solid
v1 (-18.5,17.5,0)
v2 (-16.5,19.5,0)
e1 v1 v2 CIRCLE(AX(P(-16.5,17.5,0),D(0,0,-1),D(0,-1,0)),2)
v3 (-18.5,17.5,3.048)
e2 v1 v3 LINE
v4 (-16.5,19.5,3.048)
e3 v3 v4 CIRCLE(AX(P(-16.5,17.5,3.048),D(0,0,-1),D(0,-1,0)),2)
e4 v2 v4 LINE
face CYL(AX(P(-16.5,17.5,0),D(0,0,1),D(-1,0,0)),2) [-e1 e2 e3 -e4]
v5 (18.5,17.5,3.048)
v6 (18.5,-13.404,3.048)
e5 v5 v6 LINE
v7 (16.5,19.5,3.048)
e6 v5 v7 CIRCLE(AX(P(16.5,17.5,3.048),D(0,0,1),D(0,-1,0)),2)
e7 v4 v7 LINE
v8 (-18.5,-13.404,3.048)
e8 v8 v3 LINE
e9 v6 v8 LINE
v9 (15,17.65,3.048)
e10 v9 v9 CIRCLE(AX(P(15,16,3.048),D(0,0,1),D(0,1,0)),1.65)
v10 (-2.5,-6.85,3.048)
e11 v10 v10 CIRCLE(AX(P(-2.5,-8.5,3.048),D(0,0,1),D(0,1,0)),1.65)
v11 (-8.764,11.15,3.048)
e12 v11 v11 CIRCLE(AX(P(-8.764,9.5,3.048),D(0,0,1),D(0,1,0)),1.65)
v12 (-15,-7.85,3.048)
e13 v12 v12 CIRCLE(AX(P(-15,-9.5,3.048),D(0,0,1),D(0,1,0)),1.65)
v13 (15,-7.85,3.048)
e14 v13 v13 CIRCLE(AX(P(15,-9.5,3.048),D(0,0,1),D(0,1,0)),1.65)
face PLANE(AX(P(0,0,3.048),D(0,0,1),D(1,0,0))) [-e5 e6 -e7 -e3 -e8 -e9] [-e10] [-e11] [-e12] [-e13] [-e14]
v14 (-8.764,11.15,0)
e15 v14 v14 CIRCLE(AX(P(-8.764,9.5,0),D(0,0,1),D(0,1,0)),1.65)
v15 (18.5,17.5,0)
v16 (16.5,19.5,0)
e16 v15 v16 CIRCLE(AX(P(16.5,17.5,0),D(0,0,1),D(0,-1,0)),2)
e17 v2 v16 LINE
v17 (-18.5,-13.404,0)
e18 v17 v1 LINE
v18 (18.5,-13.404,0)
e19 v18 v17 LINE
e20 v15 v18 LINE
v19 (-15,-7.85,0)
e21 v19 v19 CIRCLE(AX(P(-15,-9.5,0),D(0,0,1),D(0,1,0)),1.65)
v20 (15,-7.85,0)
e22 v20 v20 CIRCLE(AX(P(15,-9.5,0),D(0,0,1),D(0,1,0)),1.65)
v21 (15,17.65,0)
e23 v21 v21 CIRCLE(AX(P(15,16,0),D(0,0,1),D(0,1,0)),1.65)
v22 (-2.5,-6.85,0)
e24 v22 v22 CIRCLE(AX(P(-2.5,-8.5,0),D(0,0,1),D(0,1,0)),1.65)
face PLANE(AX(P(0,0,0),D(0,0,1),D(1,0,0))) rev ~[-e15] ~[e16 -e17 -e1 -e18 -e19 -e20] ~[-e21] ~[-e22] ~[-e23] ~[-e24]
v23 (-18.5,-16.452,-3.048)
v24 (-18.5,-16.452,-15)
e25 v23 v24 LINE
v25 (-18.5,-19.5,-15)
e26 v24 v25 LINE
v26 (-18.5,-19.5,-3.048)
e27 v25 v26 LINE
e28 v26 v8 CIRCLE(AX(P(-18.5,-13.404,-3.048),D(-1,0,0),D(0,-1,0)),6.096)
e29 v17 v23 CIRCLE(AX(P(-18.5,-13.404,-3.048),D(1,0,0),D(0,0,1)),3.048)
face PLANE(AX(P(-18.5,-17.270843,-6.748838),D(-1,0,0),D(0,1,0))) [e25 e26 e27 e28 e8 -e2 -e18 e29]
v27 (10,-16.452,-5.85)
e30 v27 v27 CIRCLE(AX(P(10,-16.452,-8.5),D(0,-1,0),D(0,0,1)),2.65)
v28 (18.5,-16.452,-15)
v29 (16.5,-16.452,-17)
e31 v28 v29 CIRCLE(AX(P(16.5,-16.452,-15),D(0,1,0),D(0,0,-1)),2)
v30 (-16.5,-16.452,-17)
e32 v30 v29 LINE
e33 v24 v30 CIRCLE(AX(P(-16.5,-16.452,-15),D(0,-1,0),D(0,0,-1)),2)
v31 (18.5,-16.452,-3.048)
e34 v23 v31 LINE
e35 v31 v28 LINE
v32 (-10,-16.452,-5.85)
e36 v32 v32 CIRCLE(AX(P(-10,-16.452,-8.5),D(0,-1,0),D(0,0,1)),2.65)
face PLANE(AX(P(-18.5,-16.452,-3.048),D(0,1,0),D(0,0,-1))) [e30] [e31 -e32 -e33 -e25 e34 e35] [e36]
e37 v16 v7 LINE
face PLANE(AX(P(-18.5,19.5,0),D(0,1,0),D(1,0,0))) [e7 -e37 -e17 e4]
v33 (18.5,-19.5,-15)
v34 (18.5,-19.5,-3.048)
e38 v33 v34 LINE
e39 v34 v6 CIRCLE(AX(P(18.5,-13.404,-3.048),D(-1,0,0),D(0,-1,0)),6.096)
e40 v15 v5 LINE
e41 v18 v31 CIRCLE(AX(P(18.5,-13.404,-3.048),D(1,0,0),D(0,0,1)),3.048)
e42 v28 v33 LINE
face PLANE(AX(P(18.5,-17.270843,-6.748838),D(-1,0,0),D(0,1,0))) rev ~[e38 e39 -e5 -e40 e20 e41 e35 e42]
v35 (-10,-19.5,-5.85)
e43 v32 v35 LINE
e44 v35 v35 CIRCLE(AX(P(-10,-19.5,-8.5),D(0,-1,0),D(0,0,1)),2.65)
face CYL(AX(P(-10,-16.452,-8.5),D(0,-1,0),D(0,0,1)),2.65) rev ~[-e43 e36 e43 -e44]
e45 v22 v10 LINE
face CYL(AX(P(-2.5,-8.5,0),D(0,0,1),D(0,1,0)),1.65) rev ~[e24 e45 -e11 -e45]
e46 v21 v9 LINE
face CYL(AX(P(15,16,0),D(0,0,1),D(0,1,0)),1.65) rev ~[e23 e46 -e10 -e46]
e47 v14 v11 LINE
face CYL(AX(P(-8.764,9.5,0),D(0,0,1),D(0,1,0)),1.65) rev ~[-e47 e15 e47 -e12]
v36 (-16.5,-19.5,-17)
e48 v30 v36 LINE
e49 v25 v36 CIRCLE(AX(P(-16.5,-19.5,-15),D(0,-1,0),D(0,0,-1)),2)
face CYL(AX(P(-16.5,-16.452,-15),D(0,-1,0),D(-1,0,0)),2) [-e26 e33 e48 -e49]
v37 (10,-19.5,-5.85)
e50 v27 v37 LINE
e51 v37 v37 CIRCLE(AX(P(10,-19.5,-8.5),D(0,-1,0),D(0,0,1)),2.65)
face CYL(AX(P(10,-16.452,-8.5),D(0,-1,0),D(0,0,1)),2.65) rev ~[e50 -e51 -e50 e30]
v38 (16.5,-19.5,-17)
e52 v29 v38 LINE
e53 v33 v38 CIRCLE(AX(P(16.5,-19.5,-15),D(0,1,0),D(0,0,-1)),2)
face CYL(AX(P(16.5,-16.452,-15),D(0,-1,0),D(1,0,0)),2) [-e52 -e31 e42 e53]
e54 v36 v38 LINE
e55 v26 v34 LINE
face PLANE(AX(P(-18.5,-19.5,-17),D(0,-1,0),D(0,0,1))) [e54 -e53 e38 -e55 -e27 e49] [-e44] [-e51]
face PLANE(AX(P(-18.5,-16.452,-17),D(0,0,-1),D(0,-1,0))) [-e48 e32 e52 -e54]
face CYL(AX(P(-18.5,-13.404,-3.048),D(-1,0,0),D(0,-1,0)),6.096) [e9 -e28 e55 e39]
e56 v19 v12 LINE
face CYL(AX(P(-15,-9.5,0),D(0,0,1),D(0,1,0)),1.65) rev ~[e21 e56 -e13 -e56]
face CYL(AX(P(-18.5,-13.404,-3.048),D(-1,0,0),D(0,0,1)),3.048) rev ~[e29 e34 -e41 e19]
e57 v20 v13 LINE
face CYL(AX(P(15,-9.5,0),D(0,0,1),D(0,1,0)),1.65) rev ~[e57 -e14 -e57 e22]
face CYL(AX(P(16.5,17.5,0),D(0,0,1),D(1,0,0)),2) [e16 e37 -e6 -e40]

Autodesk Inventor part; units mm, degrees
ref_plane "YZ Plane" through (0, 0, 0) normal (1, 0, 0) x (0, 1, 0)
ref_plane "XZ Plane" through (0, 0, 0) normal (0, 1, 0) x (-1, 0, 0)
ref_plane "XY Plane" through (0, 0, 0) normal (0, 0, 1) x (1, 0, 0)
sketch "Sketch1" plane through (0, 0, 0) normal (0, 0, 1) x (1, 0, 0)
  line L0 (18.5, -19.5) -> (-18.5, -19.5)
  line L1 (-18.5, -19.5) -> (-18.5, 19.5)
  line L2 (-18.5, 19.5) -> (18.5, 19.5)
  line L3 (18.5, 19.5) -> (18.5, -19.5)
  line L4 (18.5, -19.5) -> (-18.5, 19.5) construction
  line L5 (-18.5, -19.5) -> (18.5, 19.5) construction
  circle A0 centre (-2.5, -8.5) radius 9 construction
  circle A1 centre (-8.764, 9.5) radius 9 construction
  circle A2 centre (-15, -9.5) radius 2.5 construction
  circle A3 centre (15, 16) radius 2.5 construction
  circle A4 centre (15, -9.5) radius 2.5 construction
  line L6 (-15, -9.5) -> (15, -9.5) construction
  point P0 (0, 0)
  point P1 (0, -9.5)
  dimension "d0" = 37
  dimension "d1" = 39
  dimension "d2" = 11
  dimension "d3" = 2.5
  dimension "d4" = 18
  dimension "d5" = 18
  dimension "d6" = 18
  dimension "d7" = 6.264
  dimension "d8" = 5
  dimension "d10" = 30
  dimension "d11" = 10
  dimension "d12" = 3.5
  dimension "d13" = 3.5
extrude "Plate1" add sketch "Sketch1" along normal blind 3.048
sketch "Sketch2" plane through (-18.5, -16.452, 3.048) normal (0, -1, 0) x (1, 0, 0)
  line L0 (37, 0) -> (0, 0)
  line L1 (0, 0) -> (0, -20.048)
  line L2 (0, -20.048) -> (37, -20.048)
  line L3 (37, -20.048) -> (37, 0)
edge flange "Flange1" height 17 angle 90 thickness 3.048 bend radius 3.048 thickness toward (0, -1, 0) relief tear relief width 3.048 relief depth 1.524 edges at (0, -19.5, 0) wall of the first edge with corners at (18.5, -16.452, 3.048) (-18.5, -16.452, 3.048) (-18.5, -16.452, -17) (18.5, -16.452, -17)
bend "Bend1"
corner "Corner1"
hole "Hole1" at (-2.5, -8.5, 0) at (-8.764, 9.5, 0) direction (0, 0, 1) diameter 3.3 end through all
hole "Hole2" at (15, 16, 0) at (15, -9.5, 0) at (-15, -9.5, 0) direction (0, 0, 1) diameter 3.3 end through all
sketch "Sketch3" plane through (-18.5, -16.452, -17) normal (0, 1, 0) x (1, 0, 0)
  line L0 (0, -13.952) -> (37, -13.952) construction
  line L1 (37, -13.952) -> (37, 0) construction
  line L2 (37, 0) -> (0, 0) construction
  line L3 (0, -13.952) -> (0, 0) construction
  line L4 (8.5, -8.5) -> (28.5, -8.5) construction
  line L5 (8.5, -8.5) -> (0, -8.5) construction
  line L6 (0, -8.5) -> (0, 0) construction
  line L7 (0, 0) -> (8.5, 0) construction
  line L8 (8.5, 0) -> (8.5, -8.5) construction
  point P0 (18.5, -17)
  point P1 (18.5, 0)
  point P2 (18.5, -8.5)
  dimension "d39" = 20
hole "Hole3" at (-10, -16.452, -8.5) at (10, -16.452, -8.5) direction (0, -1, 0) diameter 5.3 end through all
fillet "Fillet1" radius 2 4 edges at (18.5, -17.976, -17) (-18.5, 19.5, 1.524) (18.5, 19.5, 1.524) (-18.5, -17.976, -17)
ref_plane "Work Plane1" through (0, -16.452, -17) normal (-1, 0, 0) x (0, -1, 0)
equation "\"d13\" = d12"
equation "\"d30\" = Thickness"
equation "\"d14\" = Thickness"
equation "\"d15\" = BendReliefWidth"
equation "\"d16\" = BendReliefDepth"
equation "\"d17\" = MinimumRemnant"
equation "\"d18\" = TransitionRadius"
equation "\"d21\" = BendRadius"
equation "\"d22\" = CornerReliefSize"
equation "\"d23\" = GapSize"
equation "\"d24\" = JacobiRadiusSize"
equation "\"BendRadius\" = Thickness"
equation "\"BendReliefWidth\" = Thickness"
equation "\"BendReliefDepth\" = 0.5 * Thickness"
equation "\"CornerReliefSize\" = 4 * Thickness"
equation "\"MinimumRemnant\" = 2 * Thickness"
equation "\"TransitionRadius\" = BendRadius"
equation "\"JacobiRadiusSize\" = BendRadius"
equation "\"GapSize\" = Thickness"
equation "\"Thickness\" = 3.048"
properties part number "XY Idler Mount"
